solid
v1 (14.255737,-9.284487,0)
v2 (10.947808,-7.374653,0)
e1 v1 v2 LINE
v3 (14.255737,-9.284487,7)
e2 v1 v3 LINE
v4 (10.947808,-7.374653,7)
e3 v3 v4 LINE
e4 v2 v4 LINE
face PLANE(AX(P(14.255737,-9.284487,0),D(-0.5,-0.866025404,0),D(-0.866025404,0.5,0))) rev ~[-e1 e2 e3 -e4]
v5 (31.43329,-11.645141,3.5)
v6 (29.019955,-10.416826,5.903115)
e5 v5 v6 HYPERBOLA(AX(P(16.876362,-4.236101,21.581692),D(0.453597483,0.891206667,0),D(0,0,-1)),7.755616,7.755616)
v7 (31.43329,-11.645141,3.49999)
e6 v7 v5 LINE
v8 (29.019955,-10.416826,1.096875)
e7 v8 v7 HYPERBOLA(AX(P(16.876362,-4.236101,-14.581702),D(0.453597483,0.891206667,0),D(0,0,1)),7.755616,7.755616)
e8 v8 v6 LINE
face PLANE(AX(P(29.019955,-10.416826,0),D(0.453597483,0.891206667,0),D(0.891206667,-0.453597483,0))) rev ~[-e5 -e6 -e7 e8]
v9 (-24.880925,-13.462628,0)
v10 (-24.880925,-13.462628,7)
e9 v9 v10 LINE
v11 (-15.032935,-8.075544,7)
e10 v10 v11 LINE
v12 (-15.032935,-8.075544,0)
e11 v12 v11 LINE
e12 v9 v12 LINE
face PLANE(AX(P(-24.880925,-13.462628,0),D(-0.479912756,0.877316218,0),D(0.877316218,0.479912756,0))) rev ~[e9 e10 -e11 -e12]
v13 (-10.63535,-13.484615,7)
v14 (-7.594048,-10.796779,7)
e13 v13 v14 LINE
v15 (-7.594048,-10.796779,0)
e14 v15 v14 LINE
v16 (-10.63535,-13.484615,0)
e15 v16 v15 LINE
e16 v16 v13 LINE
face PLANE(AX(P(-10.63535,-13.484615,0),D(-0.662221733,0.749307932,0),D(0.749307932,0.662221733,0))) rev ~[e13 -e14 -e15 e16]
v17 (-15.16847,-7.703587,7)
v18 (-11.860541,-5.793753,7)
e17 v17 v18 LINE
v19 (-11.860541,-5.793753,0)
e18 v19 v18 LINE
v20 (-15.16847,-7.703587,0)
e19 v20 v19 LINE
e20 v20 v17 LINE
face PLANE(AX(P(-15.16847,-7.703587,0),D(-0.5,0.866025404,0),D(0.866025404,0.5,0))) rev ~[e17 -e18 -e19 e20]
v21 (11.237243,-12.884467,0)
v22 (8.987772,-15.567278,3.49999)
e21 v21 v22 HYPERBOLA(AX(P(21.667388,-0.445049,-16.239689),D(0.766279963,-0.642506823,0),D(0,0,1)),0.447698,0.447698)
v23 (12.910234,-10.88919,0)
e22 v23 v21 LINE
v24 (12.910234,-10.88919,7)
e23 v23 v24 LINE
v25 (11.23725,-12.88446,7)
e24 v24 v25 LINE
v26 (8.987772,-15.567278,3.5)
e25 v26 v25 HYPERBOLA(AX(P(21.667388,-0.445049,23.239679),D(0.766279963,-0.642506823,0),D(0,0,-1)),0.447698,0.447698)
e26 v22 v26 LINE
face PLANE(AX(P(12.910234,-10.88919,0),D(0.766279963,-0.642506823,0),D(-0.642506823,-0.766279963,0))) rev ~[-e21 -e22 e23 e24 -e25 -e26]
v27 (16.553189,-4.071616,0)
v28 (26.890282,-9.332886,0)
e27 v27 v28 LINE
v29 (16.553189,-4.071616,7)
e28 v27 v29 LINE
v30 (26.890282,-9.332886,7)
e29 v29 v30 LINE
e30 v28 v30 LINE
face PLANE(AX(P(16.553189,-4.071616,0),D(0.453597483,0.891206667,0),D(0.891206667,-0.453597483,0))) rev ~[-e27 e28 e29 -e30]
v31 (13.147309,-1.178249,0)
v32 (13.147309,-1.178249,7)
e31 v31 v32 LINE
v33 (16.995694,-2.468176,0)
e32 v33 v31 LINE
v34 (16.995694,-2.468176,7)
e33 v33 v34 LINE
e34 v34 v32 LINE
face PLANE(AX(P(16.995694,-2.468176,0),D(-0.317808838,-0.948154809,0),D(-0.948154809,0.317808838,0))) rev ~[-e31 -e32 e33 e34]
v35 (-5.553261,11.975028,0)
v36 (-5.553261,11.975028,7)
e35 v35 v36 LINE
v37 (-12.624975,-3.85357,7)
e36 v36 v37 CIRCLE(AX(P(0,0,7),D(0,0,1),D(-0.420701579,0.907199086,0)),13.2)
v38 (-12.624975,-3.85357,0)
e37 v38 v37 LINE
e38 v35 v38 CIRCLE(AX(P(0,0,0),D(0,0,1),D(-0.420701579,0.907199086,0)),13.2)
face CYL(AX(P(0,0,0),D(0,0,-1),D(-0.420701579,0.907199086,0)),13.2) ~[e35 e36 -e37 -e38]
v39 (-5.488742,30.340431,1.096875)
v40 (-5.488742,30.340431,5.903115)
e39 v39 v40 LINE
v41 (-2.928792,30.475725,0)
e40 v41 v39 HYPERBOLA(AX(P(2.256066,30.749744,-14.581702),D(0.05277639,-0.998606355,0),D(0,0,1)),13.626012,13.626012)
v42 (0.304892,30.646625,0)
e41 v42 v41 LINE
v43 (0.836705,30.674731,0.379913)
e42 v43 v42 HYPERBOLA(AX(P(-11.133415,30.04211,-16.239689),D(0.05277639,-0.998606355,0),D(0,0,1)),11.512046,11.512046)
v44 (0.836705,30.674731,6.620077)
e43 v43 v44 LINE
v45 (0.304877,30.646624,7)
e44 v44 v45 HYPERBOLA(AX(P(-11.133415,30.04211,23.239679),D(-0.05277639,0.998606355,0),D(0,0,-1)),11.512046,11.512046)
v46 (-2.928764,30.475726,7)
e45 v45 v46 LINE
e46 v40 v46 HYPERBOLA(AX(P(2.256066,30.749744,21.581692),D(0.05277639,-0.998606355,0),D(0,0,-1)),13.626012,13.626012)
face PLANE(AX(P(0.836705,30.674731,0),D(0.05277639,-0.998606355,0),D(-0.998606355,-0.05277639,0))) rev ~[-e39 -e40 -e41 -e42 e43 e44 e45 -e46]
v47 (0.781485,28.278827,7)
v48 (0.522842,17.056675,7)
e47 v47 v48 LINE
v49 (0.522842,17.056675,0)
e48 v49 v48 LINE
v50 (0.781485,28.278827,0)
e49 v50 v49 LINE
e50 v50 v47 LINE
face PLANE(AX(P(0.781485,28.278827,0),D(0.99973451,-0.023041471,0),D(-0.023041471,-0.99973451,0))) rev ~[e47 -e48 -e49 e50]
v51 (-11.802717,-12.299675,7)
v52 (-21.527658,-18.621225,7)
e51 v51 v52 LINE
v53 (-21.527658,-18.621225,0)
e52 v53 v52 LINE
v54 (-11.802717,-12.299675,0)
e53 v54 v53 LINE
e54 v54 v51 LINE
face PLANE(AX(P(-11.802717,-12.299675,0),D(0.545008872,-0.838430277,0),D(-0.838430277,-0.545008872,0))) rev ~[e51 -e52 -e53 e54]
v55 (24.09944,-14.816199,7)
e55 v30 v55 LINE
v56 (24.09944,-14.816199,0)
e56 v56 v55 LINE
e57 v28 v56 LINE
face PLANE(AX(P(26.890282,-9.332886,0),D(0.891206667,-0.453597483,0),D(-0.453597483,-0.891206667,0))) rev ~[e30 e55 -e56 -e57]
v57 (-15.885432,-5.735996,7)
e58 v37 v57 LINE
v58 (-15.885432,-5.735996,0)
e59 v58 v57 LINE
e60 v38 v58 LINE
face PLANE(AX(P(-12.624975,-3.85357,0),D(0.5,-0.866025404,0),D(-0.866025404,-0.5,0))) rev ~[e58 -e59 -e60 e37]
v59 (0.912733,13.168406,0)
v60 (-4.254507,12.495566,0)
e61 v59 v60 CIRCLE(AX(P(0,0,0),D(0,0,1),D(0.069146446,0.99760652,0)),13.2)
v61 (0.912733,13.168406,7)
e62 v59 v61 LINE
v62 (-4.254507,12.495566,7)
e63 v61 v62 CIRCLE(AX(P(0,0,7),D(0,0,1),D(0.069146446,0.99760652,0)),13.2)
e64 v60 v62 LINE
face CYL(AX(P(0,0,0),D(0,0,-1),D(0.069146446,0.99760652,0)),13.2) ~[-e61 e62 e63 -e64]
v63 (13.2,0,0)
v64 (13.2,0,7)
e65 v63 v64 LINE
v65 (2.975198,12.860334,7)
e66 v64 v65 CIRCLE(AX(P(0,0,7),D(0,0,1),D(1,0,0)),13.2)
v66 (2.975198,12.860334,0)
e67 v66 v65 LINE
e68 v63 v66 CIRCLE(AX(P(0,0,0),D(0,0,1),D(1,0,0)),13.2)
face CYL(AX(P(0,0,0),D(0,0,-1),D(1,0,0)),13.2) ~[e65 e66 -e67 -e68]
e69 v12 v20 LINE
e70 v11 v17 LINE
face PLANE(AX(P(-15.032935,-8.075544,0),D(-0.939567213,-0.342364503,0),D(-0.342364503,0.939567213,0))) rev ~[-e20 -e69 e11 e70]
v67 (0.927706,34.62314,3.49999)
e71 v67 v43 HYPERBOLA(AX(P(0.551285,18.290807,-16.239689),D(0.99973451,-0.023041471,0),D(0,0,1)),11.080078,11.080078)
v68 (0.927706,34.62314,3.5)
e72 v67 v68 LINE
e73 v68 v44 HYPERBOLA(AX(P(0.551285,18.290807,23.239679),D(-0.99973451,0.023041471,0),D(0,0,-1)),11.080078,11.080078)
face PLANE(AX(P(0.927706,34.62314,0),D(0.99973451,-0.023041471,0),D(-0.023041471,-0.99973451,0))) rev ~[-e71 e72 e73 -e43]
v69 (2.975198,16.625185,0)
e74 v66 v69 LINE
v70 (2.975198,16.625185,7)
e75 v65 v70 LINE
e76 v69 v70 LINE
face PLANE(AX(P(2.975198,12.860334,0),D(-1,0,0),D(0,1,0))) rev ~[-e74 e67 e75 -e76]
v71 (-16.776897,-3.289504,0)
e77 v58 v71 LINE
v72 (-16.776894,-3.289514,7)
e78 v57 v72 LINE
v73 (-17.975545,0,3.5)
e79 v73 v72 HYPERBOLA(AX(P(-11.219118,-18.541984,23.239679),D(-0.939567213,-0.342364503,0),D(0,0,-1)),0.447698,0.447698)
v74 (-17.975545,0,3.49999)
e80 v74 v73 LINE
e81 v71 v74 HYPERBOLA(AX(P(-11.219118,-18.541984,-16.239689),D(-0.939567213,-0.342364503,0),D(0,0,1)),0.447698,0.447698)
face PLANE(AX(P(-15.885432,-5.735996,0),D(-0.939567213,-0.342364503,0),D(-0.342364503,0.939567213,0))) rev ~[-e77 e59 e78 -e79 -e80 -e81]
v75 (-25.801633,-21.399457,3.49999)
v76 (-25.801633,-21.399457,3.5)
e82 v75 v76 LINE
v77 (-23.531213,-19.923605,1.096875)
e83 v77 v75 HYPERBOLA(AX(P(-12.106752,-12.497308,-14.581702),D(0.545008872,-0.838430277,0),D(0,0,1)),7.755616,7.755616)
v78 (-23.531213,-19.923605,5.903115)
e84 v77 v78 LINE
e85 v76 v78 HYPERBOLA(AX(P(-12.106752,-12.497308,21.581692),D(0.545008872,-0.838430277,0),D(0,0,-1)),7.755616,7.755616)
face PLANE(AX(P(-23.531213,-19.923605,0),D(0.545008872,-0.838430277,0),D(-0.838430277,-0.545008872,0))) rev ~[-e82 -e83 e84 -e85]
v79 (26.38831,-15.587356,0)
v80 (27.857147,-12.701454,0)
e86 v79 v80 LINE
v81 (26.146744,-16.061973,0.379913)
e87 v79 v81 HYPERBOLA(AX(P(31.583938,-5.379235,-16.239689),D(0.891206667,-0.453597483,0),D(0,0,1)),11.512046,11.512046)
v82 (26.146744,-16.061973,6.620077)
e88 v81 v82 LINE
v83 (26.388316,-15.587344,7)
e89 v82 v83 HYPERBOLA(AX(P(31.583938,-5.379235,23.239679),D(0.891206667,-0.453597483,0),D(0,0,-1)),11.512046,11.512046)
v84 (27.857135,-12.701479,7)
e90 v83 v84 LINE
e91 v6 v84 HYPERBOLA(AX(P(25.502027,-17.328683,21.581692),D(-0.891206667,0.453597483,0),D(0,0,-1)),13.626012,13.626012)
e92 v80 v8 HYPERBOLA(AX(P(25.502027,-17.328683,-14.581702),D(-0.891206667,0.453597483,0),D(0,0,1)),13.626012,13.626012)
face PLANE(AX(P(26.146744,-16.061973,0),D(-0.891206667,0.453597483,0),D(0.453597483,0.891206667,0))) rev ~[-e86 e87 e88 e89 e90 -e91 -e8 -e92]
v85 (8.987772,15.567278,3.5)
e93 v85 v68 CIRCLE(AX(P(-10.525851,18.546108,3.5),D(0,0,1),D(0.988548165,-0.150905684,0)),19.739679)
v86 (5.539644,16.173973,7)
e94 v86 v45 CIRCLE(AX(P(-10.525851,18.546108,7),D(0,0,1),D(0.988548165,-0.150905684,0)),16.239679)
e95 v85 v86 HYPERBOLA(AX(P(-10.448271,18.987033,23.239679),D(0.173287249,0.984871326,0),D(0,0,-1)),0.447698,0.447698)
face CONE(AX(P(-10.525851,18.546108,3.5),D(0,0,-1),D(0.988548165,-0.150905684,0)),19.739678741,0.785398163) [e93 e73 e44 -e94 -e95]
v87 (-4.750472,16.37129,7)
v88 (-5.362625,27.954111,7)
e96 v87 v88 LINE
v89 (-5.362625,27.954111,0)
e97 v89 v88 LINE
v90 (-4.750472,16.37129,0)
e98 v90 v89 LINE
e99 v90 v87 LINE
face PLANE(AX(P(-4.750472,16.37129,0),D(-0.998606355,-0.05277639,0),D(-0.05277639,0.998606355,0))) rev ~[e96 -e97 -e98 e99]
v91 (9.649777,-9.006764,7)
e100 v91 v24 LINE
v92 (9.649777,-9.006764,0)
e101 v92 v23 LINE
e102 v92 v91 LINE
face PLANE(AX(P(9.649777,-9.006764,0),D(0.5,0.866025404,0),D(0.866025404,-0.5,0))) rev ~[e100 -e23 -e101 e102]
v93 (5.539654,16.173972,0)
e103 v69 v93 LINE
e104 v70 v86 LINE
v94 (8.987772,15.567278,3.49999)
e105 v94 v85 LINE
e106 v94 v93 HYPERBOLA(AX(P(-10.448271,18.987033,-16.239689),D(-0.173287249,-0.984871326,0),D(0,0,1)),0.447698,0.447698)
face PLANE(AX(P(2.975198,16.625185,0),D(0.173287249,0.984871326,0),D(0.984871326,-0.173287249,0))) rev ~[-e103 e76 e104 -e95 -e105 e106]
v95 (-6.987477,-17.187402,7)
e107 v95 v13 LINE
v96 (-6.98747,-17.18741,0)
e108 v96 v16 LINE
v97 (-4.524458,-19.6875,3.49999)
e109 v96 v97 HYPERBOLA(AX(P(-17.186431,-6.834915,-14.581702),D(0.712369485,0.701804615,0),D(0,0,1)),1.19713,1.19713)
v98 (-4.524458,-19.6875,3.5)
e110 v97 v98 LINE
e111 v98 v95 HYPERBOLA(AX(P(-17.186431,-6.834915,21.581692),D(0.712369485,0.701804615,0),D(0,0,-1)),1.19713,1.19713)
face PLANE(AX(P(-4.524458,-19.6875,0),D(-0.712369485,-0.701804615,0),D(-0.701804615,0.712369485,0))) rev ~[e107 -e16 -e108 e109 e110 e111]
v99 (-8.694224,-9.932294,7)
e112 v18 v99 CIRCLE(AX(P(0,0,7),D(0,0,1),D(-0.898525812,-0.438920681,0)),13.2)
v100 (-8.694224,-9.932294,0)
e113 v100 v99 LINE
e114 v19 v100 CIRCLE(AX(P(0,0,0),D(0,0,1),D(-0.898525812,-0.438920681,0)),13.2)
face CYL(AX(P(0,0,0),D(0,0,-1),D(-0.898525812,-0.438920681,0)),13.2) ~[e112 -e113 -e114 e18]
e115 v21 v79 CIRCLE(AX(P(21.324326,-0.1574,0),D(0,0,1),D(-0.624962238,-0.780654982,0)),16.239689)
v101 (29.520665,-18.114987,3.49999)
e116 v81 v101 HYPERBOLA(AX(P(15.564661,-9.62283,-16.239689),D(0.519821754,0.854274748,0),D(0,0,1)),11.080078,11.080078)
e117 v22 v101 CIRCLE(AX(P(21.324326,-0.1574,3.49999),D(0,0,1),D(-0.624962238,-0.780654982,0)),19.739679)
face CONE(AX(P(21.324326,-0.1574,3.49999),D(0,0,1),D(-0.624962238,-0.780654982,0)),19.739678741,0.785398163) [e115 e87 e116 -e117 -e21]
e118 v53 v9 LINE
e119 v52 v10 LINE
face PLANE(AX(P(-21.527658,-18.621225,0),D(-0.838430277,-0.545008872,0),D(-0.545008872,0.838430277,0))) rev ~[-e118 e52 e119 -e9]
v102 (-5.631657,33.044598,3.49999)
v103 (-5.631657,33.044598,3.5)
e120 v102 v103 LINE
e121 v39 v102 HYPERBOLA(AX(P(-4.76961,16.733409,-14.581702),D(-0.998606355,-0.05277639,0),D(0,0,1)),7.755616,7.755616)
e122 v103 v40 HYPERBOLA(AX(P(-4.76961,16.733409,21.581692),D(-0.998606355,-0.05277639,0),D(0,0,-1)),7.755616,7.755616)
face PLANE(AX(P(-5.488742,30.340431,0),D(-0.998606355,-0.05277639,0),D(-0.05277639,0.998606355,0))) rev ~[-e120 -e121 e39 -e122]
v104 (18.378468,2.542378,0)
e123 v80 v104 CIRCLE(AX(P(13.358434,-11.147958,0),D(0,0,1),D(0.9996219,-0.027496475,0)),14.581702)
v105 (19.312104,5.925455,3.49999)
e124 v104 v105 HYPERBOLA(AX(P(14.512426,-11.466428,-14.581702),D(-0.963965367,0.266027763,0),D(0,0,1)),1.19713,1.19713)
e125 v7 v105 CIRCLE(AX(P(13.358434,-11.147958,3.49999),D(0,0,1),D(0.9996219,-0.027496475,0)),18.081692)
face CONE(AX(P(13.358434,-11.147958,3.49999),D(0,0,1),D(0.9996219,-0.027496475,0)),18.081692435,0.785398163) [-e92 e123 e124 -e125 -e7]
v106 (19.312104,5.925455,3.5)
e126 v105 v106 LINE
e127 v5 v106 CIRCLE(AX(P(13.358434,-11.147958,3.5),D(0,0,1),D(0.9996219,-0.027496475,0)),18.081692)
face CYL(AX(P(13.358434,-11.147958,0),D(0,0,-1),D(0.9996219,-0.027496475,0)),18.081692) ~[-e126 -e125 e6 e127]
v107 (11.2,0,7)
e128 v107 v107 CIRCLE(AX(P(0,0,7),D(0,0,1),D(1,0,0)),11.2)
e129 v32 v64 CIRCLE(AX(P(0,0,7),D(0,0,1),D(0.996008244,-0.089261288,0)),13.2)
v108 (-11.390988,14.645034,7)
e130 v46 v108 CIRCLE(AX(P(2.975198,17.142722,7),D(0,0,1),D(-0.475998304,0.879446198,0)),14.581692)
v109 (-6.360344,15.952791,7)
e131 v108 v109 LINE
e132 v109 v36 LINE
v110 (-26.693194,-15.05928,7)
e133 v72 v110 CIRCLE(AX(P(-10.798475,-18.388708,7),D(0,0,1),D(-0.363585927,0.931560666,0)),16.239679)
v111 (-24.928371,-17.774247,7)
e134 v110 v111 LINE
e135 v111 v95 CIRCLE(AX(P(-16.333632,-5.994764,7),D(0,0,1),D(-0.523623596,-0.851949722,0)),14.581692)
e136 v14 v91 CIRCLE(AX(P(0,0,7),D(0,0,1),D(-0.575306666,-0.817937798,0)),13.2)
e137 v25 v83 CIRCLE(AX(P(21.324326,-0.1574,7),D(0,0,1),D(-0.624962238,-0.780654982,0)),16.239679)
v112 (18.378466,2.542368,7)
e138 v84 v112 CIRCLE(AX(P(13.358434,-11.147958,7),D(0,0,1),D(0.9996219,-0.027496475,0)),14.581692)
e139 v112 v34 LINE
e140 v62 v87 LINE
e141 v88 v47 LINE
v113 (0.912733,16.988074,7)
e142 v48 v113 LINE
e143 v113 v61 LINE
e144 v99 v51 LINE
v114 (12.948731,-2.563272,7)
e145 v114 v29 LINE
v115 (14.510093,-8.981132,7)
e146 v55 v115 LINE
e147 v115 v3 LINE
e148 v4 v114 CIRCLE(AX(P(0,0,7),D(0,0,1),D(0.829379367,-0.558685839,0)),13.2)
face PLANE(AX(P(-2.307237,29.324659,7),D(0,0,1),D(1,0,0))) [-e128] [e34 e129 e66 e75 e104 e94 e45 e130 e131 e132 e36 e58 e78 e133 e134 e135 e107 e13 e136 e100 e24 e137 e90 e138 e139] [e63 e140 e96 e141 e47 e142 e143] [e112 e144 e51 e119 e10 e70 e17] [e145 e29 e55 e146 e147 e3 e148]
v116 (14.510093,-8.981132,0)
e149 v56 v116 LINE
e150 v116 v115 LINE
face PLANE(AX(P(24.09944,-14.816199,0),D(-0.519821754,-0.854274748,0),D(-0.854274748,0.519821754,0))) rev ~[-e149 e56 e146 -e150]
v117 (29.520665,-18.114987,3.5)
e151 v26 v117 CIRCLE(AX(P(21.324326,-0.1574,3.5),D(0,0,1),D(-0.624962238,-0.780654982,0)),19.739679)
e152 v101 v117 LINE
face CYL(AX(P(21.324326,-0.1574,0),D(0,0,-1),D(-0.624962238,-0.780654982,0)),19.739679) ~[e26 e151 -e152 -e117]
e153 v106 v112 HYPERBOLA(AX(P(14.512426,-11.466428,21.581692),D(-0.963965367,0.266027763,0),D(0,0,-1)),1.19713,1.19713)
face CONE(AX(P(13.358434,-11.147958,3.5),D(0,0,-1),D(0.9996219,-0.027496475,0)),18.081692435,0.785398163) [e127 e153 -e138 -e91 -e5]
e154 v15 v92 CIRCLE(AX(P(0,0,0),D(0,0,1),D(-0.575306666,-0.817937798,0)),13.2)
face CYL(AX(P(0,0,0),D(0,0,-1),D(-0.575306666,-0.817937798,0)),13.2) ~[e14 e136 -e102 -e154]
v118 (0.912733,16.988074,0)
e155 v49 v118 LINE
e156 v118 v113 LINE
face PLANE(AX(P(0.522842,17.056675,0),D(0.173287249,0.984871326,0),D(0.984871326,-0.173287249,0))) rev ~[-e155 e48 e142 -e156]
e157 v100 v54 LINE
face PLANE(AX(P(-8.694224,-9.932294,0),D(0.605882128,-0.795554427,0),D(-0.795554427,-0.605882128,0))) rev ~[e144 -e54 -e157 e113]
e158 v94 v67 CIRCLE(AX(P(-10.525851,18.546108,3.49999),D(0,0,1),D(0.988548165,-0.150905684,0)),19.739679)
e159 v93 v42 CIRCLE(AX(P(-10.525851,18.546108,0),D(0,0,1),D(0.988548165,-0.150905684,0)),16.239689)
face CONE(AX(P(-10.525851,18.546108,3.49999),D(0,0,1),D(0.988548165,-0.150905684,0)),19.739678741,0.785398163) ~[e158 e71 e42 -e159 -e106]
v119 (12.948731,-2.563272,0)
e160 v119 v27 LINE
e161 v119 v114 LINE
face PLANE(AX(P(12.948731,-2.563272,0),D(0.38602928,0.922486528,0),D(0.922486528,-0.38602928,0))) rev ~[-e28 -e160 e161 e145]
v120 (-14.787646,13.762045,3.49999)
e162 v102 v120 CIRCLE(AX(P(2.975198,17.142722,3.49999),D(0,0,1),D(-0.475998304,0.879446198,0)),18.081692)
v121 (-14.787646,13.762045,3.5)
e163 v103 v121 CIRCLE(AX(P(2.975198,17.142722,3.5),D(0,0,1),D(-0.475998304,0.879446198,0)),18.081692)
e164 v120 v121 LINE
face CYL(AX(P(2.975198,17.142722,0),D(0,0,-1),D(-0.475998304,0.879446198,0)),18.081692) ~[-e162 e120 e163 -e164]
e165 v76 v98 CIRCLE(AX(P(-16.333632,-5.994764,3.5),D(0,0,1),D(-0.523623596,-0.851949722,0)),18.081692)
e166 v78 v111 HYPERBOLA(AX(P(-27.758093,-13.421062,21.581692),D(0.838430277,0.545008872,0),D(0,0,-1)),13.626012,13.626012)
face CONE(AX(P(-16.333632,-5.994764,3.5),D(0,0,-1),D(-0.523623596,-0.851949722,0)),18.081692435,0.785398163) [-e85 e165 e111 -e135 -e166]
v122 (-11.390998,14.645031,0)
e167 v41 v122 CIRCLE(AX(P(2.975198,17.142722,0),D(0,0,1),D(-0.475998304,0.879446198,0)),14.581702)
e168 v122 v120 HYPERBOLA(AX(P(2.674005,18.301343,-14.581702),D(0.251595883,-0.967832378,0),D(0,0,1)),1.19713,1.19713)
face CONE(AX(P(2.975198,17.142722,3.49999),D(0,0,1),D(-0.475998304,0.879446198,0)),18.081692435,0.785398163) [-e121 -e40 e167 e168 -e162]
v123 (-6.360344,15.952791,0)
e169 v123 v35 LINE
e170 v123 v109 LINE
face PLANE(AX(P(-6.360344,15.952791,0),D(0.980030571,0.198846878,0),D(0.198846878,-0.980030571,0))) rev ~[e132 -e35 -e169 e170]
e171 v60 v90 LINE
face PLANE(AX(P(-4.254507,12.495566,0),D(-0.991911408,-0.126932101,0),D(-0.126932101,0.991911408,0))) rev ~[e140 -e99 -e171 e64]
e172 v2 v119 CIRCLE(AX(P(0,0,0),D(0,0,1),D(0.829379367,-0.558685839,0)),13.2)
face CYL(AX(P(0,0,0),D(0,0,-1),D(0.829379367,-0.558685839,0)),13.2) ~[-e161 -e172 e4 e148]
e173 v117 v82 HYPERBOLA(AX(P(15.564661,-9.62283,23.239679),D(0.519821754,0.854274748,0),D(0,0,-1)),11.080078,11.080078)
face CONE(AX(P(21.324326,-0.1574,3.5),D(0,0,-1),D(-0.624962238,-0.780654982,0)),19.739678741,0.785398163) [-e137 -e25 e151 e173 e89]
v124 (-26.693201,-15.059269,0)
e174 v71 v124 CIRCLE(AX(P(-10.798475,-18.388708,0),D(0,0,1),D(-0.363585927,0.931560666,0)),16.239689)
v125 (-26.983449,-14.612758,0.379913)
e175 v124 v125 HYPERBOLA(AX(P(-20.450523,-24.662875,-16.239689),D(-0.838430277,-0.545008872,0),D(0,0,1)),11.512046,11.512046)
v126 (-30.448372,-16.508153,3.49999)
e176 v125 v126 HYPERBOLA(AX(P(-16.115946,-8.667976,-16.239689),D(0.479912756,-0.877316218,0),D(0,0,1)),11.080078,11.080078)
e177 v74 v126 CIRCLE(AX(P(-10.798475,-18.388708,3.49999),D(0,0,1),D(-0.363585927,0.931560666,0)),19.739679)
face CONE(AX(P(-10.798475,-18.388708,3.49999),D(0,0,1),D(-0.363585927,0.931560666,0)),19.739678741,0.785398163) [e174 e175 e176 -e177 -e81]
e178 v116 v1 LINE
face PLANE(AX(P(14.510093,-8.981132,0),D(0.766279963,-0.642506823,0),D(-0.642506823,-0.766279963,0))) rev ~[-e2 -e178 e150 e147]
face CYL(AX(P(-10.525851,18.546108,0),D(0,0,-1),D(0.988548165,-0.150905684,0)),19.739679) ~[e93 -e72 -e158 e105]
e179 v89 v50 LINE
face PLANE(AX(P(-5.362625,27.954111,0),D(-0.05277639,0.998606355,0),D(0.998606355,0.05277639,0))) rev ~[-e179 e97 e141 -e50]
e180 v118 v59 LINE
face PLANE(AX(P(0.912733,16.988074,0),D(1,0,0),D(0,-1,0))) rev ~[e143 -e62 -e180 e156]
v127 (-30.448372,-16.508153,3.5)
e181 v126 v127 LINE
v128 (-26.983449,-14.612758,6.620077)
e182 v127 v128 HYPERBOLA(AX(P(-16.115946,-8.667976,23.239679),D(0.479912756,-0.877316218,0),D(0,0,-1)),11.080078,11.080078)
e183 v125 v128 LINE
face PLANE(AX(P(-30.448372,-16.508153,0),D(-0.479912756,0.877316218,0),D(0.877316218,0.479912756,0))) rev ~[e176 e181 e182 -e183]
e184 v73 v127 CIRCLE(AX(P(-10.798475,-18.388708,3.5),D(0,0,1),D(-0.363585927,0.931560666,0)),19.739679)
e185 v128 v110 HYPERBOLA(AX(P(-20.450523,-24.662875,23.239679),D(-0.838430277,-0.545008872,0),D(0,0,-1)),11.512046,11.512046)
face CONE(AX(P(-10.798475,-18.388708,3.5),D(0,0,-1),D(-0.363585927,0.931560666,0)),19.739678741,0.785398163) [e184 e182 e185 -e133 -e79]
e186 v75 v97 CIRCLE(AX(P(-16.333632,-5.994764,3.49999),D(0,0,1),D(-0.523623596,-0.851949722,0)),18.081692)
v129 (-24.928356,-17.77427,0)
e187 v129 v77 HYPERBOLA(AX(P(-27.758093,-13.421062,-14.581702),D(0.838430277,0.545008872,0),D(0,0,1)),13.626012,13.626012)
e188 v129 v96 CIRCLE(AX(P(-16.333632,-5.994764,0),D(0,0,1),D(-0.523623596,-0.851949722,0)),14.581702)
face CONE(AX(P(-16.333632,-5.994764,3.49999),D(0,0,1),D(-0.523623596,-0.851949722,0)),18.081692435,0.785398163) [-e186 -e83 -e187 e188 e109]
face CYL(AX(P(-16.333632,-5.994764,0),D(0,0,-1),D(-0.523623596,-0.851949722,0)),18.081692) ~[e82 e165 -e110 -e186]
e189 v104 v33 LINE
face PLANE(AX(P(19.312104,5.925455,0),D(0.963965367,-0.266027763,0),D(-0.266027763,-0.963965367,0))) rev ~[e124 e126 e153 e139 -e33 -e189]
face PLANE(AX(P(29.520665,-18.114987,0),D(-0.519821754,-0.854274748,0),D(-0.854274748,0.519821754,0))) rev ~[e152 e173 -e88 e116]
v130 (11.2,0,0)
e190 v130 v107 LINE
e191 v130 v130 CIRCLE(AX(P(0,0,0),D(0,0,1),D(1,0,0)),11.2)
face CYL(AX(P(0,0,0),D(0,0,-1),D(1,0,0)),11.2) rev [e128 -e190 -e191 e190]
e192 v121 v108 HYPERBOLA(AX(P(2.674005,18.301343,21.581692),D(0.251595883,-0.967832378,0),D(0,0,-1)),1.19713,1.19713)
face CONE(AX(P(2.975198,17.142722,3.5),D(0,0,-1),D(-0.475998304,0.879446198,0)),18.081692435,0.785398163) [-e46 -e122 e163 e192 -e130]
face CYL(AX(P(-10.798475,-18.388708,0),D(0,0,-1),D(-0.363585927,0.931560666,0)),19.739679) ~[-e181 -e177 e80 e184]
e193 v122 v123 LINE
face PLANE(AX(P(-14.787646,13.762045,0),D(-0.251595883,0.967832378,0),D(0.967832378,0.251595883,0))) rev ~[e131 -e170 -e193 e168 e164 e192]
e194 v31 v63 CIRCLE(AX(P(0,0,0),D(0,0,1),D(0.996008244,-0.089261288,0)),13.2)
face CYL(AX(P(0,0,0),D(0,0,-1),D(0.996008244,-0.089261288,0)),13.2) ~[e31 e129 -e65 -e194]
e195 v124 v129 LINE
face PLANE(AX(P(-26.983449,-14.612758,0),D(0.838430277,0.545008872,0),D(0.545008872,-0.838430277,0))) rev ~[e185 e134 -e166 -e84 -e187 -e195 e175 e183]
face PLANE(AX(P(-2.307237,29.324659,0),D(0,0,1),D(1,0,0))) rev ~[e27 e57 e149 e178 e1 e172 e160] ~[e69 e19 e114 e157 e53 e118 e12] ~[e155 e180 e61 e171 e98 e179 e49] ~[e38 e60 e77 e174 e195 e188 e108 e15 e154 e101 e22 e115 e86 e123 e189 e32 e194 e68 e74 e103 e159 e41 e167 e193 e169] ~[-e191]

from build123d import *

# Parameters (mm, degrees)
F0_R     = 11.2
F1_DEPTH = 7
F2_SIZE  = 3.5
F3_SIZE  = 3.49999


# Not quite as in the source:
# - a fillet or chamfer is up to 0.001 mm smaller than in the source, because OpenCascade refuses the exact size


with BuildPart() as f1:
    # F0 (on Top) → F1 (new body)
    with BuildSketch(Plane.XY):
        Polygon((-5.4887417888, 30.3404310419), (-5.3626246511, 27.9541106613), (0.7814850479, 28.2788271306), (0.8367048606, 30.6747311771), align=None)
        with BuildLine():
            Line((-6.3603435788, 15.9527909689), (-4.7504720739, 16.3712901342))
            Line((-4.7504720739, 16.3712901342), (-5.3626246511, 27.9541106613))
            Line((-5.3626246511, 27.9541106613), (-5.4887417888, 30.3404310419))
            Line((-5.4887417888, 30.3404310419), (-5.6316571191, 33.0445977541))
            ThreePointArc((-5.6316571191, 33.0445977541), (-13.3586462682, 24.898567552), (-14.7876461409, 13.7620452616))
            Line((-14.7876461409, 13.7620452616), (-6.3603435788, 15.9527909689))
        make_face()
        with BuildLine():
            ThreePointArc((-5.5532608378, 11.975027936), (-4.9107856444, 12.2525174701), (-4.2545066222, 12.4955661497))
            Line((-4.2545066222, 12.4955661497), (-4.7504720739, 16.3712901342))
            Line((-4.7504720739, 16.3712901342), (-6.3603435788, 15.9527909689))
            Line((-6.3603435788, 15.9527909689), (-5.5532608378, 11.975027936))
        make_face()
        with BuildLine():
            Line((0.912733085, 16.988074322), (2.9751978168, 16.625185455))
            Line((2.9751978168, 16.625185455), (8.9877722785, 15.5672782332))
            ThreePointArc((8.9877722785, 15.5672782332), (7.6544413443, 26.2358342161), (0.9277061572, 34.6231396156))
            Line((0.9277061572, 34.6231396156), (0.8367048606, 30.6747311771))
            Line((0.8367048606, 30.6747311771), (0.7814850479, 28.2788271306))
            Line((0.7814850479, 28.2788271306), (0.5228415025, 17.0566754052))
            Line((0.5228415025, 17.0566754052), (0.912733085, 16.988074322))
        make_face()
        with BuildLine():
            ThreePointArc((0.912733085, 13.1684060659), (1.9500586477, 13.055162629), (2.9751978168, 12.8603342861))
            Line((2.9751978168, 12.8603342861), (2.9751978168, 16.625185455))
            Line((2.9751978168, 16.625185455), (0.912733085, 16.988074322))
            Line((0.912733085, 16.988074322), (0.912733085, 13.1684060659))
        make_face()
        with BuildLine():
            ThreePointArc((13.1473088225, -1.1782490086), (13.1868206262, -0.5897132961), (13.2, 0))
            ThreePointArc((13.2, 0), (10.3322943043, 8.214845976), (2.9751978168, 12.8603342861))
            ThreePointArc((2.9751978168, 12.8603342861), (1.9500586477, 13.055162629), (0.912733085, 13.1684060659))
            ThreePointArc((0.912733085, 13.1684060659), (-1.7044180771, 13.089498043), (-4.2545066222, 12.4955661497))
            ThreePointArc((-4.2545066222, 12.4955661497), (-4.9107856444, 12.2525174701), (-5.5532608378, 11.975027936))
            ThreePointArc((-5.5532608378, 11.975027936), (-12.0518959346, 5.3844038094), (-12.6249751013, -3.8535702524))
            ThreePointArc((-12.6249751013, -3.8535702524), (-12.2811318111, -4.8387809867), (-11.8605407229, -5.7937529945))
            ThreePointArc((-11.8605407229, -5.7937529945), (-10.4836287895, -8.020818375), (-8.6942244092, -9.9322938902))
            ThreePointArc((-8.6942244092, -9.9322938902), (-8.1555985672, -10.3791238557), (-7.5940479846, -10.7967789274))
            ThreePointArc((-7.5940479846, -10.7967789274), (1.3629174841, -13.1294499478), (9.6497772845, -9.0067640337))
            ThreePointArc((9.6497772845, -9.0067640337), (10.3310731634, -8.2163816423), (10.9478076379, -7.3746530714))
            ThreePointArc((10.9478076379, -7.3746530714), (12.1880468666, -5.068679668), (12.9487310314, -2.5632722595))
            ThreePointArc((12.9487310314, -2.5632722595), (13.0663842116, -1.8733936144), (13.1473088225, -1.1782490086))
        make_face()
        Circle(F0_R, mode=Mode.SUBTRACT)
        with BuildLine():
            Line((-15.1684704667, -7.7035871225), (-15.885431855, -5.7359958369))
            Line((-15.885431855, -5.7359958369), (-17.975544557, 0))
            ThreePointArc((-17.975544557, 0), (-26.5481195928, -6.4889764521), (-30.4483715445, -16.5081527084))
            Line((-30.4483715445, -16.5081527084), (-26.983448884, -14.6127579238))
            Line((-26.983448884, -14.6127579238), (-24.8809252083, -13.4626276612))
            Line((-24.8809252083, -13.4626276612), (-15.0329349563, -8.0755436793))
            Line((-15.0329349563, -8.0755436793), (-15.1684704667, -7.7035871225))
        make_face()
        with BuildLine():
            ThreePointArc((-11.8605407229, -5.7937529945), (-12.2811318111, -4.8387809867), (-12.6249751013, -3.8535702524))
            Line((-12.6249751013, -3.8535702524), (-15.885431855, -5.7359958369))
            Line((-15.885431855, -5.7359958369), (-15.1684704667, -7.7035871225))
            Line((-15.1684704667, -7.7035871225), (-11.8605407229, -5.7937529945))
        make_face()
        with BuildLine():
            Line((-10.6353504509, -13.4846146005), (-7.5940479846, -10.7967789274))
            ThreePointArc((-7.5940479846, -10.7967789274), (-8.1555985672, -10.3791238557), (-8.6942244092, -9.9322938902))
            Line((-8.6942244092, -9.9322938902), (-11.802717112, -12.2996745631))
            Line((-11.802717112, -12.2996745631), (-10.6353504509, -13.4846146005))
        make_face()
        with BuildLine():
            Line((-4.5244577341, -19.687499851), (-10.6353504509, -13.4846146005))
            Line((-10.6353504509, -13.4846146005), (-11.802717112, -12.2996745631))
            Line((-11.802717112, -12.2996745631), (-21.5276576473, -18.6212245095))
            Line((-21.5276576473, -18.6212245095), (-23.5312131497, -19.9236053449))
            Line((-23.5312131497, -19.9236053449), (-25.8016325533, -21.3994570076))
            ThreePointArc((-25.8016325533, -21.3994570076), (-14.8834688838, -24.0182108044), (-4.5244577341, -19.687499851))
        make_face()
        Polygon((-23.5312131497, -19.9236053449), (-21.5276576473, -18.6212245095), (-24.8809252083, -13.4626276612), (-26.983448884, -14.6127579238), align=None)
        with BuildLine():
            Line((14.2557373817, -9.2844871995), (10.9478076379, -7.3746530714))
            ThreePointArc((10.9478076379, -7.3746530714), (10.3310731634, -8.2163816423), (9.6497772845, -9.0067640337))
            Line((9.6497772845, -9.0067640337), (12.9102340382, -10.8891896181))
            Line((12.9102340382, -10.8891896181), (14.2557373817, -9.2844871995))
        make_face()
        with BuildLine():
            Line((14.5100934538, -8.9811317259), (14.2557373817, -9.2844871995))
            Line((14.2557373817, -9.2844871995), (12.9102340382, -10.8891896181))
            Line((12.9102340382, -10.8891896181), (8.9877722785, -15.5672782332))
            ThreePointArc((8.9877722785, -15.5672782332), (18.8936782485, -19.746857764), (29.5206653873, -18.1149869072))
            Line((29.5206653873, -18.1149869072), (26.1467440233, -16.0619732533))
            Line((26.1467440233, -16.0619732533), (24.0994401604, -14.8161994695))
            Line((24.0994401604, -14.8161994695), (14.5100934538, -8.9811317259))
        make_face()
        Polygon((29.0199549385, -10.416825697), (26.8902822984, -9.3328861518), (24.0994401604, -14.8161994695), (26.1467440233, -16.0619732533), align=None)
        with BuildLine():
            Line((19.312103875, 5.9254545894), (16.9956940297, -2.4681763684))
            Line((16.9956940297, -2.4681763684), (16.5531891859, -4.0716155711))
            Line((16.5531891859, -4.0716155711), (26.8902822984, -9.3328861518))
            Line((26.8902822984, -9.3328861518), (29.0199549385, -10.416825697))
            Line((29.0199549385, -10.416825697), (31.4332896725, -11.6451407465))
            ThreePointArc((31.4332896725, -11.6451407465), (28.242115152, -0.8803567476), (19.312103875, 5.9254545894))
        make_face()
        with BuildLine():
            Line((16.9956940297, -2.4681763684), (13.1473088225, -1.1782490086))
            ThreePointArc((13.1473088225, -1.1782490086), (13.0663842116, -1.8733936144), (12.9487310314, -2.5632722595))
            Line((12.9487310314, -2.5632722595), (16.5531891859, -4.0716155711))
            Line((16.5531891859, -4.0716155711), (16.9956940297, -2.4681763684))
        make_face()
    extrude(amount=F1_DEPTH)

    # F2
    f2_edges = [f1.edges().sort_by_distance(p)[0] for p in [
        (-13.358646, 24.898568, 7),
        (7.654441, 26.235834, 7),
        (28.242115, -0.880357, 7),
        (18.893678, -19.746858, 7),
        (-14.883469, -24.018211, 7),
        (-26.54812, -6.488976, 7),
    ]]
    chamfer(f2_edges, length=F2_SIZE)

    # F3 (size 3.5 in the source; OpenCascade refuses exactly that, so slightly less here)
    f3_edges = [f1.edges().sort_by_distance(p)[0] for p in [
        (7.654441, 26.235834, 0),
        (-13.358646, 24.898568, 0),
        (-26.54812, -6.488976, 0),
        (-14.883469, -24.018211, 0),
        (18.893678, -19.746858, 0),
        (28.242115, -0.880357, 0),
    ]]
    chamfer(f3_edges, length=F3_SIZE)


solid = f1.part
